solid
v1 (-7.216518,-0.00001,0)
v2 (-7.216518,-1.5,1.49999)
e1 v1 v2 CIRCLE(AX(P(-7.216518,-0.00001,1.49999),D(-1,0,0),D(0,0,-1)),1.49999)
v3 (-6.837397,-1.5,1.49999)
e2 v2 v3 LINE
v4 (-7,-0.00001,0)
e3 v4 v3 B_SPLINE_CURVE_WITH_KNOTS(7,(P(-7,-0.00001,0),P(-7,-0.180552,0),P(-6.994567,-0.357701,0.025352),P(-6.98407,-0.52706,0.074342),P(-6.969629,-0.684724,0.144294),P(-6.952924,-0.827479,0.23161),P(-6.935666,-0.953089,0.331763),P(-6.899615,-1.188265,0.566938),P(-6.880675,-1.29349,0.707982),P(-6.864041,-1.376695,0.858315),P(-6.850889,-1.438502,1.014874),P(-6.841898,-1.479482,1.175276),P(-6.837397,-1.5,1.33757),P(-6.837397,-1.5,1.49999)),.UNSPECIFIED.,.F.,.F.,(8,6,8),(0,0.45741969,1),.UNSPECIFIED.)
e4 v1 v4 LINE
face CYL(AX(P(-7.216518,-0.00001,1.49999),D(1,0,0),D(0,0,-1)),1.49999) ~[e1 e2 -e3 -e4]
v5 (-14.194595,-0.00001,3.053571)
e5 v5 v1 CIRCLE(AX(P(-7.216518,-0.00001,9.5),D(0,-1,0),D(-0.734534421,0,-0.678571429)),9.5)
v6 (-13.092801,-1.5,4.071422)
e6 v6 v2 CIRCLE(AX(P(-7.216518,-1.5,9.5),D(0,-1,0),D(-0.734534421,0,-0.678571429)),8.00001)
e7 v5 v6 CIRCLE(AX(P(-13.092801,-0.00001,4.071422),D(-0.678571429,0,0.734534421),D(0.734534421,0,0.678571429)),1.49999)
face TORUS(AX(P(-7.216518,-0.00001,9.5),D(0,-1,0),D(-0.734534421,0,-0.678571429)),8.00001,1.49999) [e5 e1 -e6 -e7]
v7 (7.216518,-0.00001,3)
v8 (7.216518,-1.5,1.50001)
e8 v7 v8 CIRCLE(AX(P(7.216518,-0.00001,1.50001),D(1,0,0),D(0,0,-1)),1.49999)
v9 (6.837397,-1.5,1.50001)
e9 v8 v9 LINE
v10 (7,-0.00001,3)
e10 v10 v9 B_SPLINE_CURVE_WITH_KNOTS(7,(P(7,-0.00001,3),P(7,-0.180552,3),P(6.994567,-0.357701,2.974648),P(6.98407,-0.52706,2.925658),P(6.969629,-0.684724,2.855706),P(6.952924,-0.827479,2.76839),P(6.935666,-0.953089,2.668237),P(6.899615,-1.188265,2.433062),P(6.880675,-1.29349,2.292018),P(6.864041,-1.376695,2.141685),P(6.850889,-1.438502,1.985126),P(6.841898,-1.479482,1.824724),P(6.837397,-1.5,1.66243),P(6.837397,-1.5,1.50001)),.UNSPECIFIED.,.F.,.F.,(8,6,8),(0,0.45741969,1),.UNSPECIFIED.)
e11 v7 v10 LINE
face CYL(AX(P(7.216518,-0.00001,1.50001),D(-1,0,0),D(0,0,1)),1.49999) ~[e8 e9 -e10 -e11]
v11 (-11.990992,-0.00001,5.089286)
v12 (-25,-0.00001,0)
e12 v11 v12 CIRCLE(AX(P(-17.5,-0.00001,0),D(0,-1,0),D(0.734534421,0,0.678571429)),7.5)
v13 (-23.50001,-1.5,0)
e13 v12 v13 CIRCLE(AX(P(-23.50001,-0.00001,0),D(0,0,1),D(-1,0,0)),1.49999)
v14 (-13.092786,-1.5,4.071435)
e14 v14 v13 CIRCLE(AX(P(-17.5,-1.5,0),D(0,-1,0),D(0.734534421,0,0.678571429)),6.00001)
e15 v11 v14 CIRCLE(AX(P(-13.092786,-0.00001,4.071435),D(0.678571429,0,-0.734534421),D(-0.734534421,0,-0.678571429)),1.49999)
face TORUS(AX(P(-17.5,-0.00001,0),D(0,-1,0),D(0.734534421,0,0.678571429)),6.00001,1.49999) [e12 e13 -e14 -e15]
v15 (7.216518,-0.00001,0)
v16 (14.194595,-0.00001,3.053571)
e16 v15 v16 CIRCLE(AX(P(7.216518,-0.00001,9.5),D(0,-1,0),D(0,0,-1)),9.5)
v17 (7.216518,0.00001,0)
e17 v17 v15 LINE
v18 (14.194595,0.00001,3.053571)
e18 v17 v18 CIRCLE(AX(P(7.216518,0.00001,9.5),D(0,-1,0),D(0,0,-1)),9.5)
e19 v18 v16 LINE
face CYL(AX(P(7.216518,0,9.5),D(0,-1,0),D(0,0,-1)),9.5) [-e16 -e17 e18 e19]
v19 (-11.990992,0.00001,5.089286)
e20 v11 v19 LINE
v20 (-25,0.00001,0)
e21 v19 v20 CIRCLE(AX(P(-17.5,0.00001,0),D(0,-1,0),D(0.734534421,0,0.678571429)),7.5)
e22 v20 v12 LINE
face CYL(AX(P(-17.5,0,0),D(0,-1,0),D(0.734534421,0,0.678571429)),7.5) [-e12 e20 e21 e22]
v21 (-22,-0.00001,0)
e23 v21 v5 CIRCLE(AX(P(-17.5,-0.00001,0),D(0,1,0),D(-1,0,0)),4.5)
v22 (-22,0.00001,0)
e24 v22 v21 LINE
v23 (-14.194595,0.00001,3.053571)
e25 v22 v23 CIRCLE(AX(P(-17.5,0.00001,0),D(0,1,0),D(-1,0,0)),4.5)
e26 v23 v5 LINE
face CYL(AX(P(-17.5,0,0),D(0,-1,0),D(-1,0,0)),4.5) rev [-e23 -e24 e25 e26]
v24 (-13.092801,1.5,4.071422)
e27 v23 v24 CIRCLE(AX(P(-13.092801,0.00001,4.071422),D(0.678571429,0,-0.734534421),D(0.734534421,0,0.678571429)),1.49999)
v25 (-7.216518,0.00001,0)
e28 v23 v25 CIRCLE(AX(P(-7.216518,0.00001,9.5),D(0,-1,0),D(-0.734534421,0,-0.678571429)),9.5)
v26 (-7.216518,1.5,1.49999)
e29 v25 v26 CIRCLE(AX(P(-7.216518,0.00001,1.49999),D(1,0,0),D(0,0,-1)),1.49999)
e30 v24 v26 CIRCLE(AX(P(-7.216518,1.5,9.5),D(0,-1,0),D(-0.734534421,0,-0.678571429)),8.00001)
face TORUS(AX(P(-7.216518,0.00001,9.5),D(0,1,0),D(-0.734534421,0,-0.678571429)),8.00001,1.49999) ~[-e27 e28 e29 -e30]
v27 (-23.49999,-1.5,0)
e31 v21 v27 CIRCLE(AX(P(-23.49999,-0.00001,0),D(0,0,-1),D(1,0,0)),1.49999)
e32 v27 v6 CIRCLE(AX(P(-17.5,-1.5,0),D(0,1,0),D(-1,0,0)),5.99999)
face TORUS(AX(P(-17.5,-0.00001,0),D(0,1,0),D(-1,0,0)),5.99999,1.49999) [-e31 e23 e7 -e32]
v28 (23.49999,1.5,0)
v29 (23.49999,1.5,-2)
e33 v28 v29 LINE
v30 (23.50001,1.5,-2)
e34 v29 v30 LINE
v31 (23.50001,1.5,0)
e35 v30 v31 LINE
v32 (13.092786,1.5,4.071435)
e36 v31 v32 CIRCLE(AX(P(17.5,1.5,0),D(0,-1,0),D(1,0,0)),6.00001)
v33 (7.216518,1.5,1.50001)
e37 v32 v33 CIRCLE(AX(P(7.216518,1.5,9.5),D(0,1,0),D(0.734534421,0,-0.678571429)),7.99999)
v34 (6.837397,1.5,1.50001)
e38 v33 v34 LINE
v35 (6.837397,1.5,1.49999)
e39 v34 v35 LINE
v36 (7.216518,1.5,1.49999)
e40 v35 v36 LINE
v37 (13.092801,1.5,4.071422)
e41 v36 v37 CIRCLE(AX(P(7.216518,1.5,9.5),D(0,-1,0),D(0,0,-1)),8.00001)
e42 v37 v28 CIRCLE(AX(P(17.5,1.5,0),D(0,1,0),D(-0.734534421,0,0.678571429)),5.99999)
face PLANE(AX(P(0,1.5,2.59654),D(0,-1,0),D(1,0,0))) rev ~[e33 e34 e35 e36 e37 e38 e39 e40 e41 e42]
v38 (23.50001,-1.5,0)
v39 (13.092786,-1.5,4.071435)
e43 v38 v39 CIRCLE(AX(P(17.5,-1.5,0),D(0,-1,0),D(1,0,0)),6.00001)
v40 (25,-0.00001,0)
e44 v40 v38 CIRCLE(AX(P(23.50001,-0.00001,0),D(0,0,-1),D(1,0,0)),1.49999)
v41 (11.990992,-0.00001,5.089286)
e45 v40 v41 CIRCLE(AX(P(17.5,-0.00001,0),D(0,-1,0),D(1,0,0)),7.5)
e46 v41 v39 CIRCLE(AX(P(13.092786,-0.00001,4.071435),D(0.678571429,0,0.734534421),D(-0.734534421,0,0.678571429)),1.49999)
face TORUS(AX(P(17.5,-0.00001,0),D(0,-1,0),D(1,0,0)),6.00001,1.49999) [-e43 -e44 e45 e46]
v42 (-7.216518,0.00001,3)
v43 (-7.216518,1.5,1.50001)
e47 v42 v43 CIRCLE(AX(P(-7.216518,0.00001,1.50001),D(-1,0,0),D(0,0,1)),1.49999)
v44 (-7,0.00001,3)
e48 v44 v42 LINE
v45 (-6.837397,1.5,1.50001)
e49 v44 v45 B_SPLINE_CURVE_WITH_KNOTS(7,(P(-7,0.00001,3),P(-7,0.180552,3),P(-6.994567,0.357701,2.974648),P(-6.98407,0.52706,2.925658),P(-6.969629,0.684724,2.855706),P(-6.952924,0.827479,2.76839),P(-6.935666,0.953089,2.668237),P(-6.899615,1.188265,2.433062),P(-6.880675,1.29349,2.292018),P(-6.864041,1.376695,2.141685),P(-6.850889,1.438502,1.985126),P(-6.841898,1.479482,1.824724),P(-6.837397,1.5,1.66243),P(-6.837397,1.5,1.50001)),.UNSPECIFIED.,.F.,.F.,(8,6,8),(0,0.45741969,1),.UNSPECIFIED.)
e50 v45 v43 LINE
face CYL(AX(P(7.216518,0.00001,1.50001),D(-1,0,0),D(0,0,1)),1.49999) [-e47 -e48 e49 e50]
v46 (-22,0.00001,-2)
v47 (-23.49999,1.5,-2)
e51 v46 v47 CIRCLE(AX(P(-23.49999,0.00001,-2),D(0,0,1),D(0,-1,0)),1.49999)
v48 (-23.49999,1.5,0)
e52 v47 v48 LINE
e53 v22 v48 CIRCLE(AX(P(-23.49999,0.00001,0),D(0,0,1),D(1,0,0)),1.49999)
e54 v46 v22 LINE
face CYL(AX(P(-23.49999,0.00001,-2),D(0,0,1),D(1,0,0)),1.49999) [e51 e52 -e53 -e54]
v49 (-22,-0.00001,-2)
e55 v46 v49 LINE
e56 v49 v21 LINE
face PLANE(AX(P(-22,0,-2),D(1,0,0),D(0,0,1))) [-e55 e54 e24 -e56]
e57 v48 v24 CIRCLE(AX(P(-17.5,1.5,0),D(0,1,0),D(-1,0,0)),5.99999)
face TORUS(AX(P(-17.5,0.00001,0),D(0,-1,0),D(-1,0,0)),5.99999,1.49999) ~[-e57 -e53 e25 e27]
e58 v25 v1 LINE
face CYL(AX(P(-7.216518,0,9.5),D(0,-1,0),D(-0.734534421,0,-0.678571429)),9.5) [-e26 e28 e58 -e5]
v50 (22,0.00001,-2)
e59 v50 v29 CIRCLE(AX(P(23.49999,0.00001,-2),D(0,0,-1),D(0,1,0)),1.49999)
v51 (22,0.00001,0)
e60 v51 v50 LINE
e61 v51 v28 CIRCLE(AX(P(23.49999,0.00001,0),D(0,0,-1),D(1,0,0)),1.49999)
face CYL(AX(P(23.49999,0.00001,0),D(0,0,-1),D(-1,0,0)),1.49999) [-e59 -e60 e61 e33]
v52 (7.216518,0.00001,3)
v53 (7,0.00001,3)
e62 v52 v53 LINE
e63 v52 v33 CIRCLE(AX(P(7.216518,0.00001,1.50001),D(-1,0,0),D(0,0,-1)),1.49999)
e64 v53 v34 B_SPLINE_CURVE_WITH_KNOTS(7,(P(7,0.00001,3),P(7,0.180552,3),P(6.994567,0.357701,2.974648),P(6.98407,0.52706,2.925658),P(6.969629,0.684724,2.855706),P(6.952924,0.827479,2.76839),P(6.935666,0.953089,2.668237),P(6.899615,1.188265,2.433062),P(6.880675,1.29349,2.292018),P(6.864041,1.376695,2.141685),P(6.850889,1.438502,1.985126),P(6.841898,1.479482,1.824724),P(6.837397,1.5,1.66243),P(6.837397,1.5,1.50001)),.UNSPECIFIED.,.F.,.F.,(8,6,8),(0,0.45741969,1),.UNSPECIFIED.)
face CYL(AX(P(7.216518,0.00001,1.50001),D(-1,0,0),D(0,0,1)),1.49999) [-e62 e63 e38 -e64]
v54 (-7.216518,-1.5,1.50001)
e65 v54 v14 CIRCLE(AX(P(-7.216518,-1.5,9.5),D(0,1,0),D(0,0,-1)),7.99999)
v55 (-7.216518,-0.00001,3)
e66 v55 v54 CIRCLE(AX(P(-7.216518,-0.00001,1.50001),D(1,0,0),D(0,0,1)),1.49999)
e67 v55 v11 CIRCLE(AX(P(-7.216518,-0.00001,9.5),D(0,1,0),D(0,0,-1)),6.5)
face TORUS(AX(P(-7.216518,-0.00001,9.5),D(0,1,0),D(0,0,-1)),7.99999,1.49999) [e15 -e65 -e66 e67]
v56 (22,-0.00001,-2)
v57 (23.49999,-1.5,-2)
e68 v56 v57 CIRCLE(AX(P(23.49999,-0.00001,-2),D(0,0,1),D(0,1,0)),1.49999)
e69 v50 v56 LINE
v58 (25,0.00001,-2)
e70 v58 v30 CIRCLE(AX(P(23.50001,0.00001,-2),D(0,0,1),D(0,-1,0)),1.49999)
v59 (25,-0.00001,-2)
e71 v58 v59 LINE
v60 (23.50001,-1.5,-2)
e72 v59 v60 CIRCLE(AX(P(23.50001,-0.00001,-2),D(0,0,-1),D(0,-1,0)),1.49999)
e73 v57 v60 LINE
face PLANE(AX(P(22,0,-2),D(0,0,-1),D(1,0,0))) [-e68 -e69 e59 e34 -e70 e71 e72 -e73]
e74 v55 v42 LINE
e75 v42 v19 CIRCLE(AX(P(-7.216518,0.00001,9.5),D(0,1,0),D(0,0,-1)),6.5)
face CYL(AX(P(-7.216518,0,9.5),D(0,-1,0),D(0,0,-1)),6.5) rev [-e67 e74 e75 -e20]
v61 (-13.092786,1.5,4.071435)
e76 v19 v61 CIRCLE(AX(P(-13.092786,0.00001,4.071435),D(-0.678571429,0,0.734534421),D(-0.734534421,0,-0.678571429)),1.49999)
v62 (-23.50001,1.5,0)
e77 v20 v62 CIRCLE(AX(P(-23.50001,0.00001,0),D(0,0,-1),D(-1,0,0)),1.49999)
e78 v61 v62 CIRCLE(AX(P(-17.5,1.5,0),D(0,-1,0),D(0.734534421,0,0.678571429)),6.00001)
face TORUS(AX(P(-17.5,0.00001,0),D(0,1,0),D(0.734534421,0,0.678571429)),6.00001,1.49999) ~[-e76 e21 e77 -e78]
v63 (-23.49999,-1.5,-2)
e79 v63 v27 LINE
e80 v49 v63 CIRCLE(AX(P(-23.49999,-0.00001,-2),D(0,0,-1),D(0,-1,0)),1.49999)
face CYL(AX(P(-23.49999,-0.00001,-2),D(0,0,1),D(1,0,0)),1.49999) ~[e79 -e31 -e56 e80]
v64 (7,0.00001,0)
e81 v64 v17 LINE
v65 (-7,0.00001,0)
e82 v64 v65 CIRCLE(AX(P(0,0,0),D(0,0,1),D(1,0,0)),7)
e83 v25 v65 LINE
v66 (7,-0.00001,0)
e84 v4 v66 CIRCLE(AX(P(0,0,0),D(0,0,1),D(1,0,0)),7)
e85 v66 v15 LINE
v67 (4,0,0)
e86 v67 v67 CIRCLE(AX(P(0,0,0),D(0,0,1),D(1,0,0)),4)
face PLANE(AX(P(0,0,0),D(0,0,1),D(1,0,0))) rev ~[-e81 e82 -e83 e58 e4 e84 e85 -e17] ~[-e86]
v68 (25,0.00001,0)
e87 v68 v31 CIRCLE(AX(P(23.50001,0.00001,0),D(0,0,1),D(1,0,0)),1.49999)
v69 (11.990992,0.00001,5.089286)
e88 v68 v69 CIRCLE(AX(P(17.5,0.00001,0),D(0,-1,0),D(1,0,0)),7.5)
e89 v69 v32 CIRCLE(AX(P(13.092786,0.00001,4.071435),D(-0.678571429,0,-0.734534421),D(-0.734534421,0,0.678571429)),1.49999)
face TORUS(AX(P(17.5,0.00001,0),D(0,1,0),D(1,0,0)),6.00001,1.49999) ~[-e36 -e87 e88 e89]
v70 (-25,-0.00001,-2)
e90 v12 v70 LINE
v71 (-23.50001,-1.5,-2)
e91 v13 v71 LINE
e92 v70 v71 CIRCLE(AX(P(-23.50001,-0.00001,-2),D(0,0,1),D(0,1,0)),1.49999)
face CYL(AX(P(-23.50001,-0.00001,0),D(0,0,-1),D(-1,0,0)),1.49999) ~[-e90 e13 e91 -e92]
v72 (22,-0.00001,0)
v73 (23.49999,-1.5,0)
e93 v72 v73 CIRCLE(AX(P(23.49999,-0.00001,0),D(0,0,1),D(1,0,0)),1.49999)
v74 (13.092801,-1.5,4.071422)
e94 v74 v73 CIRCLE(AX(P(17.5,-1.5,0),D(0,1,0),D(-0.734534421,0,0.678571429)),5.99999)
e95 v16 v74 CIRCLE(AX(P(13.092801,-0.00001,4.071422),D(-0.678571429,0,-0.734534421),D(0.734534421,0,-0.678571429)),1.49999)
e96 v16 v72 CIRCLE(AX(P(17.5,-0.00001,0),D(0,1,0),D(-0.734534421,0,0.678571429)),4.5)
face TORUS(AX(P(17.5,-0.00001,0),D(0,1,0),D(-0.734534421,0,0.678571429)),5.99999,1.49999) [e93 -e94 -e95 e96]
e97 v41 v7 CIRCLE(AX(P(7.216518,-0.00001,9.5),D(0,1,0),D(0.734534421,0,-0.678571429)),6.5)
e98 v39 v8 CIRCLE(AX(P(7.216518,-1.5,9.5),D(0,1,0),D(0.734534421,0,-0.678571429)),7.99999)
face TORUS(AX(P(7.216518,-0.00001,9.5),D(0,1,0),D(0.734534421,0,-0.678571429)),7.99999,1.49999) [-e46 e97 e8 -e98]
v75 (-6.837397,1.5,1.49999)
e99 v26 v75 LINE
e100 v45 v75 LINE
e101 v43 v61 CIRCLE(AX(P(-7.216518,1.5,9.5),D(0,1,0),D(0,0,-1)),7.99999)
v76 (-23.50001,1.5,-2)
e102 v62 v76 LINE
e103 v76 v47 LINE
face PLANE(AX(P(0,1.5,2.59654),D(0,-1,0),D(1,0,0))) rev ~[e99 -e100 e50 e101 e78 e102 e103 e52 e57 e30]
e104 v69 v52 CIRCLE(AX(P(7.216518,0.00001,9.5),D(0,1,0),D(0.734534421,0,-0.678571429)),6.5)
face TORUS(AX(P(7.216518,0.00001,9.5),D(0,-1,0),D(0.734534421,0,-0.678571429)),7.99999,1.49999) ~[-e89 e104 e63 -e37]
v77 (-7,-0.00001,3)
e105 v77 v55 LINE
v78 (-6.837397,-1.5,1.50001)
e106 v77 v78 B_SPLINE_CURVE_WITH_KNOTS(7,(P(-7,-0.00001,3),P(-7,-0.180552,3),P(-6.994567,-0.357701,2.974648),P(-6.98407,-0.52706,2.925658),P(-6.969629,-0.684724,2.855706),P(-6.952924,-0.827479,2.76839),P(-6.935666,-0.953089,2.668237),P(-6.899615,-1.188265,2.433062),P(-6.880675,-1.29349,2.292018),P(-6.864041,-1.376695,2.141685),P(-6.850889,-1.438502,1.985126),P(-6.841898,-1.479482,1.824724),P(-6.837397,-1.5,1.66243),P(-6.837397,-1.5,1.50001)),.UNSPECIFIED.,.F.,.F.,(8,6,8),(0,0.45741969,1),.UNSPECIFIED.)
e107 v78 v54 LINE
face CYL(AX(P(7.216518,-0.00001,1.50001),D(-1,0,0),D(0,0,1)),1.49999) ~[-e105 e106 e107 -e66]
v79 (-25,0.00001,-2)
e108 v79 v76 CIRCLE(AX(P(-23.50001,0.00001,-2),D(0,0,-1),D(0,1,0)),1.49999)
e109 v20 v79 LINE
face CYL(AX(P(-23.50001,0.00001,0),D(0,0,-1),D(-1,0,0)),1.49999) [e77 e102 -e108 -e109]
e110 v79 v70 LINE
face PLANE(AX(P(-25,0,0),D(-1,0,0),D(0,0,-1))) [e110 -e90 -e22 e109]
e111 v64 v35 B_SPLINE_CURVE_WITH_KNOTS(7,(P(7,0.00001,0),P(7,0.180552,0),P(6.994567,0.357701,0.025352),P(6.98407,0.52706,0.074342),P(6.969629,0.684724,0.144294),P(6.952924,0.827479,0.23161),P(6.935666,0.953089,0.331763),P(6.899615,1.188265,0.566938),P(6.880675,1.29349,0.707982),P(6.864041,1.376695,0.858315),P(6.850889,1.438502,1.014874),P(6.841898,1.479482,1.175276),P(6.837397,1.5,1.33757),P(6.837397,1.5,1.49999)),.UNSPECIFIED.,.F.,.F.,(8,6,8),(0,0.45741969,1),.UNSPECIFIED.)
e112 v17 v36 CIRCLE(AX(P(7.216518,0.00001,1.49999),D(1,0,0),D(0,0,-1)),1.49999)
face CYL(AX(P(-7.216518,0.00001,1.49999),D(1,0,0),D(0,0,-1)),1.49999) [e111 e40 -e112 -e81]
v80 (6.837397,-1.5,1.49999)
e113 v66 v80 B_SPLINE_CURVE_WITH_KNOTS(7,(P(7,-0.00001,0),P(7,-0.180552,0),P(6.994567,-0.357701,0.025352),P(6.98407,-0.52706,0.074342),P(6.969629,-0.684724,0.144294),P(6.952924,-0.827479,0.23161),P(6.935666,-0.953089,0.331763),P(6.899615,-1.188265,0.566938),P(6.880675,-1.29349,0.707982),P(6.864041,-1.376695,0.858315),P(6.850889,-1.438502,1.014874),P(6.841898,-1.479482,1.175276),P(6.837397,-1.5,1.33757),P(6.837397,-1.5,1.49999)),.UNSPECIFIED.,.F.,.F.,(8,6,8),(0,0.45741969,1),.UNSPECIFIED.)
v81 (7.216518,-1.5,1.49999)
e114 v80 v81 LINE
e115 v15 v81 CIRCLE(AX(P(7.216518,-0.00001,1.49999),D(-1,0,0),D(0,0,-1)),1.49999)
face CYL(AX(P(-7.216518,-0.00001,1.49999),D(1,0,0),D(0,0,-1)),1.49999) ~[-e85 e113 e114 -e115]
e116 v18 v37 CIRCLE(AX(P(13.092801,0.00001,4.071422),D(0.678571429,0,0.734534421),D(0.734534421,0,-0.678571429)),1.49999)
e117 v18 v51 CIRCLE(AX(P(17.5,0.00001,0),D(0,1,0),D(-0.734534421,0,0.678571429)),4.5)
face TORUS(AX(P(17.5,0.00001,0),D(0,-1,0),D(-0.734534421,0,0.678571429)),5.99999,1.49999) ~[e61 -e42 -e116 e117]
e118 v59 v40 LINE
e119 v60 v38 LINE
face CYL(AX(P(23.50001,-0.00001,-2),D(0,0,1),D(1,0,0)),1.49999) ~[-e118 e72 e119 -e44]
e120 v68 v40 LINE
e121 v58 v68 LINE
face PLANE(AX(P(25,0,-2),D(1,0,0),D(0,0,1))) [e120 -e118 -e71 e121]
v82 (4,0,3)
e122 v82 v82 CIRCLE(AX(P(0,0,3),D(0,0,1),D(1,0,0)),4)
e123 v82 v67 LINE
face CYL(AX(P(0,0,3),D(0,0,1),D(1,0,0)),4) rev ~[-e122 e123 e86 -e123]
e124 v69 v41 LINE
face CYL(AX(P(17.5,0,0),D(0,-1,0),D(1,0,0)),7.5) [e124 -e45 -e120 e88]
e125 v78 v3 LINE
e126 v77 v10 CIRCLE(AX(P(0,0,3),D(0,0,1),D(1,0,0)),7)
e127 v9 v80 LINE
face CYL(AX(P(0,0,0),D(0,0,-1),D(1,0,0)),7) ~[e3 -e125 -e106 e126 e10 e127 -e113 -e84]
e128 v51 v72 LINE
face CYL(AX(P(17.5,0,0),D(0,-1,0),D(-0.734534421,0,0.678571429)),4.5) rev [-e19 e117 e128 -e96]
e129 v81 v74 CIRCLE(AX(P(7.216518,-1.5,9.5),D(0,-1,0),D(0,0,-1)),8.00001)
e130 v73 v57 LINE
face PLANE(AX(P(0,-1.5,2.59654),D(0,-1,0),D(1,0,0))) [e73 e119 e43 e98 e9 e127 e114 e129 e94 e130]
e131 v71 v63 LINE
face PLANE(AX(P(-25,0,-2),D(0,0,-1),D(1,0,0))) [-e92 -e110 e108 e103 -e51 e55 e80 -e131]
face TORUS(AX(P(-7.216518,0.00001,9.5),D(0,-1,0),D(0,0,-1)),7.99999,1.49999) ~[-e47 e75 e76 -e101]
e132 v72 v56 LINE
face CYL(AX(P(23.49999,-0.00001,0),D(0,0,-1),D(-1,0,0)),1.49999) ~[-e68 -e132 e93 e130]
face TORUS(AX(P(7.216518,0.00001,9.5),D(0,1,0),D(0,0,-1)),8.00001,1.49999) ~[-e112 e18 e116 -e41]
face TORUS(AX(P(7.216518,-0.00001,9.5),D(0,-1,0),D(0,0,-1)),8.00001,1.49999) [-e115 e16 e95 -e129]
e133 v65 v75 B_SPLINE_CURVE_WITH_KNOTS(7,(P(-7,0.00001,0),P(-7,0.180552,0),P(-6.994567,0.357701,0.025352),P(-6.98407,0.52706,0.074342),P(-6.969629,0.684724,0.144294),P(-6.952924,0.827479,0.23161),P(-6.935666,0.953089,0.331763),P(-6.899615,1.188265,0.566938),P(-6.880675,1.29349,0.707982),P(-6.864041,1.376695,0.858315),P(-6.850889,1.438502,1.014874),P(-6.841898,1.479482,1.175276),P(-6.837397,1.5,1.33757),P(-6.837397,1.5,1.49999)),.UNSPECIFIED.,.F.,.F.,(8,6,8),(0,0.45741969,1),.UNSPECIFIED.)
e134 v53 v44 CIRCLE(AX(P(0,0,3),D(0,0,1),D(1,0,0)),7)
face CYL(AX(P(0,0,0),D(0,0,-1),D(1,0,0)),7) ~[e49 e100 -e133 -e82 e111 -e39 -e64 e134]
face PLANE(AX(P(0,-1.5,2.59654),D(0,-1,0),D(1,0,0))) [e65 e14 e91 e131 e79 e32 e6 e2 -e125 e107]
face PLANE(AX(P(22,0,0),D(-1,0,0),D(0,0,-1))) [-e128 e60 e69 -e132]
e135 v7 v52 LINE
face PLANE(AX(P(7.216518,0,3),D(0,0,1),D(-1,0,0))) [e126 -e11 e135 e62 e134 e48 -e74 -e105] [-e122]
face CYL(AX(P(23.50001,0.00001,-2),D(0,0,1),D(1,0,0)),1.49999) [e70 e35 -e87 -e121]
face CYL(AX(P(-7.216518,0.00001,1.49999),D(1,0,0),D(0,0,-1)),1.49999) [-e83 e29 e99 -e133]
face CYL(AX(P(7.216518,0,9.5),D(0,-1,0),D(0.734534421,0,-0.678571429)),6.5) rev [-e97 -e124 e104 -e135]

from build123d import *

# Parameters (mm, degrees)
F1_DEPTH = 1.5
F2_R     = 1.49999
F3_R     = 7
F4_DEPTH = 3
F5_R     = 4
F6_DEPTH = 25


# Not quite as in the source:
# - a fillet or chamfer is up to 0.001 mm smaller than in the source, because OpenCascade refuses the exact size


with BuildPart() as f1:
    # F0 (on Front) → F1 (new body, symmetric)
    with BuildSketch(Plane.XZ):
        with BuildLine():
            ThreePointArc((-11.990991839, 5.0892857143), (-20.2324383609, 6.9845386823), (-25, 0))
            Line((-25, 0), (-25, -2))
            Line((-25, -2), (-22, -2))
            Line((-22, -2), (-22, 0))
            ThreePointArc((-22, 0), (-19.1394630165, 4.1907232094), (-14.1945951034, 3.0535714286))
            ThreePointArc((-14.1945951034, 3.0535714286), (-11.0249907967, 0.7968088775), (-7.2165180994, 0))
            Line((-7.2165180994, 0), (0, 0))
            Line((0, 0), (7.2165180994, 0))
            ThreePointArc((7.2165180994, 0), (11.0249907967, 0.7968088775), (14.1945951034, 3.0535714286))
            ThreePointArc((14.1945951034, 3.0535714286), (19.1394630165, 4.1907232094), (22, 0))
            Line((22, 0), (22, -2))
            Line((22, -2), (25, -2))
            Line((25, -2), (25, 0))
            ThreePointArc((25, 0), (20.2324383609, 6.9845386823), (11.990991839, 5.0892857143))
            ThreePointArc((11.990991839, 5.0892857143), (9.822315208, 3.5451850215), (7.2165180994, 3))
            Line((7.2165180994, 3), (0, 3))
            Line((0, 3), (-7.2165180994, 3))
            ThreePointArc((-7.2165180994, 3), (-9.822315208, 3.5451850215), (-11.990991839, 5.0892857143))
        make_face()
    extrude(amount=F1_DEPTH, both=True)

    # F2 (radius 1.5 in the source; OpenCascade refuses exactly that, so slightly less here)
    f2_edges = [f1.edges().sort_by_distance(p)[0] for p in [
        (-20.232438, -1.5, 6.984539),
        (-19.139463, -1.5, 4.190723),
        (-20.232438, 1.5, 6.984539),
        (-19.139463, 1.5, 4.190723),
    ]]
    fillet(f2_edges, radius=F2_R)

    # F3 (on Top) → F4 (join)
    with BuildSketch(Plane.XY):
        Circle(F3_R)
    extrude(amount=F4_DEPTH)

    # F5 (on face) → F6 (cut)
    with BuildSketch(Plane.XY.offset(3)):
        Circle(F5_R)
    extrude(amount=-F6_DEPTH, mode=Mode.SUBTRACT)


solid = f1.part
